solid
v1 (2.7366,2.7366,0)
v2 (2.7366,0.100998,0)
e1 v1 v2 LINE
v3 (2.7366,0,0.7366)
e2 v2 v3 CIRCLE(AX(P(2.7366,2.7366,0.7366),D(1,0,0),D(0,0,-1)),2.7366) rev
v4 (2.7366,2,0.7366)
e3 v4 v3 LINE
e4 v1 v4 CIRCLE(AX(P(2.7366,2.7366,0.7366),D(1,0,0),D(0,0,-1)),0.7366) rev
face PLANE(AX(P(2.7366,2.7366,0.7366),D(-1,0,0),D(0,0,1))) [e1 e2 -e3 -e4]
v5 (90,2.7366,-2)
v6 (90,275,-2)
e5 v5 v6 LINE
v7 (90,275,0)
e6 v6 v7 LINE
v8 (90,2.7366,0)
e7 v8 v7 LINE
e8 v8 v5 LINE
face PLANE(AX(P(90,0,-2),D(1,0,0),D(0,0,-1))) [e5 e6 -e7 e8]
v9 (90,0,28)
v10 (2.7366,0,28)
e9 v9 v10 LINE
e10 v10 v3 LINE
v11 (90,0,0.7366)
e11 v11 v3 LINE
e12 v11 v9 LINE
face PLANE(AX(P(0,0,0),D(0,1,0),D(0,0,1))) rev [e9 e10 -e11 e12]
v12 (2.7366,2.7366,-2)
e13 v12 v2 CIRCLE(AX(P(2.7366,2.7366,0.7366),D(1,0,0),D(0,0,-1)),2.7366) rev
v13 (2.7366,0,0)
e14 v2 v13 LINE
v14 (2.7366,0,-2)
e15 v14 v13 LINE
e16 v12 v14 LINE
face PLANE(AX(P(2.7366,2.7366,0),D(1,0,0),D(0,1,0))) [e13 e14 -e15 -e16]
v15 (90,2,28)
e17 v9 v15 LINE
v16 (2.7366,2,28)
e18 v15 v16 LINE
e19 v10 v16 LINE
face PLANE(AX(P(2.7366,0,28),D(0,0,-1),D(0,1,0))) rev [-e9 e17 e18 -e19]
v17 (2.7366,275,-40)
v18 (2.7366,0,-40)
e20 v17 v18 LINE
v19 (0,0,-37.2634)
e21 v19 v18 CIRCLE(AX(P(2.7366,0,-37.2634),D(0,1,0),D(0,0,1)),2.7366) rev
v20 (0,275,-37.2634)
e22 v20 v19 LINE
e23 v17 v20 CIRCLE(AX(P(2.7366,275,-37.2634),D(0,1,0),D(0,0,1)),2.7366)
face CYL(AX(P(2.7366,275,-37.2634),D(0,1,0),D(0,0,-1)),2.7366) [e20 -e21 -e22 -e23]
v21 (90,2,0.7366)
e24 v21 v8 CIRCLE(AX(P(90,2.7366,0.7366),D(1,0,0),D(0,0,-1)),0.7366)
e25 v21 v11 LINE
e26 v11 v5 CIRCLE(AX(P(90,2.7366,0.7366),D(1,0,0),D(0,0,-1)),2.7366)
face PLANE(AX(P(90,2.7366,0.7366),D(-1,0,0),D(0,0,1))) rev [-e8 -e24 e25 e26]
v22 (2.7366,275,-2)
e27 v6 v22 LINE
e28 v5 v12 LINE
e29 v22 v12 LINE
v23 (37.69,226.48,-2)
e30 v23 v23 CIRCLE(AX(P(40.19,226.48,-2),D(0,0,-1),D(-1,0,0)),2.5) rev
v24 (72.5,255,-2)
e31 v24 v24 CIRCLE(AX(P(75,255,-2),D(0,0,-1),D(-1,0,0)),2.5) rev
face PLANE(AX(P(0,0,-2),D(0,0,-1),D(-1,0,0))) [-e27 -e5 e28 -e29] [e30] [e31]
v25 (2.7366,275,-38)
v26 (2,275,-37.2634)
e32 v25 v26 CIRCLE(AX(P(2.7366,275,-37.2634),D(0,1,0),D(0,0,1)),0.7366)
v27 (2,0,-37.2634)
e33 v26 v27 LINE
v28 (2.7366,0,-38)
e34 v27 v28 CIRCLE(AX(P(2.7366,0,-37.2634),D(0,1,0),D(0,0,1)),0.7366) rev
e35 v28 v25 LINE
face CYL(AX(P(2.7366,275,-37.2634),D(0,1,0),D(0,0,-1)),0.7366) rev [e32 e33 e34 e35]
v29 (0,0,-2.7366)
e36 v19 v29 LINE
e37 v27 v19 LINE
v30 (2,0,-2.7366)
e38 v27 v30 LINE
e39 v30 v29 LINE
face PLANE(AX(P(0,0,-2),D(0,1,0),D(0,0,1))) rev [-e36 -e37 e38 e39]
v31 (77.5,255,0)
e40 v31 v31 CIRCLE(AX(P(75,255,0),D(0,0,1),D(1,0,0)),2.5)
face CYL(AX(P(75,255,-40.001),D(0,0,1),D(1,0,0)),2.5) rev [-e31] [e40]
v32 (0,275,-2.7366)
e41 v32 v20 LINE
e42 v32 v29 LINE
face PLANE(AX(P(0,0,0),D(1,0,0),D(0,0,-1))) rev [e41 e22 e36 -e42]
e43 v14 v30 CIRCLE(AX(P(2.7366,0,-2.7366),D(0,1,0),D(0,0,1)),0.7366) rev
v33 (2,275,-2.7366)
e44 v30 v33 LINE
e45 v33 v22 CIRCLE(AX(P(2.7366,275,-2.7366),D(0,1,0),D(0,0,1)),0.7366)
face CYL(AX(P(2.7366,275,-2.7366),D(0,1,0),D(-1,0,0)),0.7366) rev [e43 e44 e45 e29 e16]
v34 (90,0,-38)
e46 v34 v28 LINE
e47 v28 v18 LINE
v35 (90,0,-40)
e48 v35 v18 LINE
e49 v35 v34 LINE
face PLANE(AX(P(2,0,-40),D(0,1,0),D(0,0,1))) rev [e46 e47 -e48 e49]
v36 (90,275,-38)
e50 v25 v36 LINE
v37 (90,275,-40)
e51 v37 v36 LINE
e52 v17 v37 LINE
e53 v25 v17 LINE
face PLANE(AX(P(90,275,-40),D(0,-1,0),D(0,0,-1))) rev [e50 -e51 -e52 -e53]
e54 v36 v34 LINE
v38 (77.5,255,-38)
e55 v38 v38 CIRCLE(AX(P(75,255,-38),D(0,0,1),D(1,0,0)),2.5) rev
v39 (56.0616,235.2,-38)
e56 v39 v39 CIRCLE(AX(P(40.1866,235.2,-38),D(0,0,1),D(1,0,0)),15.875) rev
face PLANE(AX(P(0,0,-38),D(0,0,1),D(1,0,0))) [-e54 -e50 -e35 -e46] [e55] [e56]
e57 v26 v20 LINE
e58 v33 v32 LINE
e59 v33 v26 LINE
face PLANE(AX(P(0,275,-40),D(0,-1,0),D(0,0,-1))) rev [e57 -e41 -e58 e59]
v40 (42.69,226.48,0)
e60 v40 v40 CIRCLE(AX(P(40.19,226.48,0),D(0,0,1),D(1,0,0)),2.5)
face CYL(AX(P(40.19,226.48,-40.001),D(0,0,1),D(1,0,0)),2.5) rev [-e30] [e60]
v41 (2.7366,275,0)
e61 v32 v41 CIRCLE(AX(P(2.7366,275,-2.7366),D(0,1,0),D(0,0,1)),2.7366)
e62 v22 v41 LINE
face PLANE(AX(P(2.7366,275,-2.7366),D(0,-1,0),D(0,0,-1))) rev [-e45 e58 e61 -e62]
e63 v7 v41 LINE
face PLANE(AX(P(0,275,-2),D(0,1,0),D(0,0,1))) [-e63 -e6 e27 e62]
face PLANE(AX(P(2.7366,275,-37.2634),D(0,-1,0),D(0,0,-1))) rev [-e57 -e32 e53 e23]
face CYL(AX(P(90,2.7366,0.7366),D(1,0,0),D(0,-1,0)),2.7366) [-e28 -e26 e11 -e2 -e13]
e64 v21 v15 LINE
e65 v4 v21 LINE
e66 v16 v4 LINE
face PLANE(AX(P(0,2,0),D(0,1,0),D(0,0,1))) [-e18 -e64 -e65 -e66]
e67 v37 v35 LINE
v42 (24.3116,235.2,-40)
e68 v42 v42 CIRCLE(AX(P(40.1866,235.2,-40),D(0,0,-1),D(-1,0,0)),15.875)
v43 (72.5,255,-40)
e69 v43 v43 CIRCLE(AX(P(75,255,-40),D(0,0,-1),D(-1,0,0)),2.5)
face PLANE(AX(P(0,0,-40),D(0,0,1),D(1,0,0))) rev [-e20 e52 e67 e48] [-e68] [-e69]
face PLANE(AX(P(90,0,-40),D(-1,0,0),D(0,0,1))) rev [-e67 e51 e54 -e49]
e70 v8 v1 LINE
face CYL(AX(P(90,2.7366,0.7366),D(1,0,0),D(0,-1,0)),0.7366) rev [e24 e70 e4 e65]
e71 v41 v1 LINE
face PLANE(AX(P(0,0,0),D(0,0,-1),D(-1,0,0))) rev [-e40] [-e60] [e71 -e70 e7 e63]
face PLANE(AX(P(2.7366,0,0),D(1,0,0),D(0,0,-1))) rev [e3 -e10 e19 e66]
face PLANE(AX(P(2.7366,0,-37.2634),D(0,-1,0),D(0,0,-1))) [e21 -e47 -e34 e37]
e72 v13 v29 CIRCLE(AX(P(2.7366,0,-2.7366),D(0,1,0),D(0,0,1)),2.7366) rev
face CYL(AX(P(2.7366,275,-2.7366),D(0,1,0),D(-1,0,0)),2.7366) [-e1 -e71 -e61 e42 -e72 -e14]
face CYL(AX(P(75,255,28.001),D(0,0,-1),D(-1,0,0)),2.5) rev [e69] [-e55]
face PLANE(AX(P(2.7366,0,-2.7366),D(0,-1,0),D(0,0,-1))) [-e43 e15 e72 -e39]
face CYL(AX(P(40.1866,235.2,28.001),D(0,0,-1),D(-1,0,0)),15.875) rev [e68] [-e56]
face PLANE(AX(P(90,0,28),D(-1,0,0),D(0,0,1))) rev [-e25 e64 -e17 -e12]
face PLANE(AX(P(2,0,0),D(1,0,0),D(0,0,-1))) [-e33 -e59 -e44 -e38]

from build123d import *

# Parameters (mm, degrees)
SKETCH1_W                    = 90
SKETCH1_H                    = 275
BASE_FLANGE1_DEPTH           = 2
EDGE_FLANGE1_STRIP_W         = 9.4732
EDGE_FLANGE1_STRIP_H         = 2
EDGE_FLANGE1_STRIP_CUT_DEPTH = 275
EDGE_FLANGE1_DEPTH           = 275
EDGE_FLANGE2_STRIP_W         = 9.4732
EDGE_FLANGE2_STRIP_H         = 2
EDGE_FLANGE2_STRIP_CUT_DEPTH = 275
EDGE_FLANGE2_DEPTH           = 275
EDGE_FLANGE3_STRIP_W         = 9.4732
EDGE_FLANGE3_STRIP_H         = 2
EDGE_FLANGE3_STRIP_CUT_DEPTH = 87.2634
EDGE_FLANGE3_DEPTH           = 87.2634
CUT_EXTRUDE2_REACH           = 294.104
SKETCH18_R                   = 2.5
CUT_EXTRUDE1_REACH           = 299.236
SKETCH17_R                   = 15.875
SKETCH17_R_2                 = 2.5


# Sheet-metal steps are written as plain solids
with BuildPart() as part:
    # Sketch1 → Base-Flange1 (new body)
    with BuildSketch(Plane.XY):
        with Locations((45, 137.5)):
            Rectangle(SKETCH1_W, SKETCH1_H)
    extrude(amount=-BASE_FLANGE1_DEPTH)

    # Edge-Flange1 strip (across the edge) → Edge-Flange1 strip cut (cut)
    with BuildSketch(Plane(origin=(0, 0, -2), x_dir=(1, 0, 0), z_dir=(0, 1, 0))):
        with Locations((-2, -1)):
            Rectangle(EDGE_FLANGE1_STRIP_W, EDGE_FLANGE1_STRIP_H)
    extrude(amount=EDGE_FLANGE1_STRIP_CUT_DEPTH, mode=Mode.SUBTRACT)

    # Edge-Flange1 section (across the edge) → Edge-Flange1 (add)
    with BuildSketch(Plane(origin=(0, 0, -2), x_dir=(1, 0, 0), z_dir=(0, 1, 0))):
        with BuildLine():
            Line((0, 0.7366), (0, 38))
            Line((0, 38), (2, 38))
            Line((2, 38), (2, 0.7366))
            ThreePointArc((2, 0.7366), (2.215745145, 0.215745145), (2.7366, 0))
            Line((2.7366, 0), (2.7366, -2))
            ThreePointArc((2.7366, -2), (0.801531583, -1.198468417), (0, 0.7366))
        make_face()
    extrude(amount=EDGE_FLANGE1_DEPTH)

    # Edge-Flange2 strip (across the edge) → Edge-Flange2 strip cut (cut)
    with BuildSketch(Plane(origin=(2, 0, -40), x_dir=(0, 0, 1), z_dir=(0, 1, 0))):
        with Locations((-2, -1)):
            Rectangle(EDGE_FLANGE2_STRIP_W, EDGE_FLANGE2_STRIP_H)
    extrude(amount=EDGE_FLANGE2_STRIP_CUT_DEPTH, mode=Mode.SUBTRACT)

    # Edge-Flange2 section (across the edge) → Edge-Flange2 (add)
    with BuildSketch(Plane(origin=(2, 0, -40), x_dir=(0, 0, 1), z_dir=(0, 1, 0))):
        with BuildLine():
            Line((0, 0.7366), (0, 88))
            Line((0, 88), (2, 88))
            Line((2, 88), (2, 0.7366))
            ThreePointArc((2, 0.7366), (2.215745145, 0.215745145), (2.7366, 0))
            Line((2.7366, 0), (2.7366, -2))
            ThreePointArc((2.7366, -2), (0.801531583, -1.198468417), (0, 0.7366))
        make_face()
    extrude(amount=EDGE_FLANGE2_DEPTH)

    # Edge-Flange3 strip (across the edge) → Edge-Flange3 strip cut (cut)
    with BuildSketch(Plane.YZ.offset(2.7366)):
        with Locations((-2, -1)):
            Rectangle(EDGE_FLANGE3_STRIP_W, EDGE_FLANGE3_STRIP_H)
    extrude(amount=EDGE_FLANGE3_STRIP_CUT_DEPTH, mode=Mode.SUBTRACT)

    # Edge-Flange3 section (across the edge) → Edge-Flange3 (add)
    with BuildSketch(Plane.YZ.offset(2.7366)):
        with BuildLine():
            Line((0, 0.7366), (0, 28))
            Line((0, 28), (2, 28))
            Line((2, 28), (2, 0.7366))
            ThreePointArc((2, 0.7366), (2.215745145, 0.215745145), (2.7366, 0))
            Line((2.7366, 0), (2.7366, -2))
            ThreePointArc((2.7366, -2), (0.801531583, -1.198468417), (0, 0.7366))
        make_face()
    extrude(amount=EDGE_FLANGE3_DEPTH)

    # Sketch18 → Cut-Extrude2 (cut, up to next)
    with BuildSketch(Plane.XY, mode=Mode.PRIVATE) as cut_extrude2_sk1:
        with Locations((40.19, 226.48)):
            Circle(SKETCH18_R)
    cut_extrude2_tool1 = extrude(cut_extrude2_sk1.sketch, amount=-CUT_EXTRUDE2_REACH, mode=Mode.PRIVATE) & part.part
    # Sketch18 → Cut-Extrude2 (cut, up to next)
    with BuildSketch(Plane.XY, mode=Mode.PRIVATE) as cut_extrude2_sk2:
        with Locations((75, 255)):
            Circle(SKETCH18_R)
    cut_extrude2_tool2 = extrude(cut_extrude2_sk2.sketch, amount=-CUT_EXTRUDE2_REACH, mode=Mode.PRIVATE) & part.part
    add(cut_extrude2_tool1.solids().sort_by_distance((40.19, 226.48, 0))[0], mode=Mode.SUBTRACT)
    add(cut_extrude2_tool2.solids().sort_by_distance((75, 255, 0))[0], mode=Mode.SUBTRACT)

    # Sketch17 → Cut-Extrude1 (cut, up to next)
    with BuildSketch(Plane(origin=(0, 0, -40), x_dir=(-1, 0, 0), z_dir=(0, 0, -1)), mode=Mode.PRIVATE) as cut_extrude1_sk1:
        with Locations((-40.1866, 235.2)):
            Circle(SKETCH17_R)
    cut_extrude1_tool1 = extrude(cut_extrude1_sk1.sketch, amount=-CUT_EXTRUDE1_REACH, mode=Mode.PRIVATE) & part.part
    # Sketch17 → Cut-Extrude1 (cut, up to next)
    with BuildSketch(Plane(origin=(0, 0, -40), x_dir=(-1, 0, 0), z_dir=(0, 0, -1)), mode=Mode.PRIVATE) as cut_extrude1_sk2:
        with Locations(Location((-75, 255, 0), (0, 0, 180))):
            Circle(SKETCH17_R_2)
    cut_extrude1_tool2 = extrude(cut_extrude1_sk2.sketch, amount=-CUT_EXTRUDE1_REACH, mode=Mode.PRIVATE) & part.part
    add(cut_extrude1_tool1.solids().sort_by_distance((40.1866, 235.2, -40))[0], mode=Mode.SUBTRACT)
    add(cut_extrude1_tool2.solids().sort_by_distance((75, 255, -40))[0], mode=Mode.SUBTRACT)


solid = part.part
